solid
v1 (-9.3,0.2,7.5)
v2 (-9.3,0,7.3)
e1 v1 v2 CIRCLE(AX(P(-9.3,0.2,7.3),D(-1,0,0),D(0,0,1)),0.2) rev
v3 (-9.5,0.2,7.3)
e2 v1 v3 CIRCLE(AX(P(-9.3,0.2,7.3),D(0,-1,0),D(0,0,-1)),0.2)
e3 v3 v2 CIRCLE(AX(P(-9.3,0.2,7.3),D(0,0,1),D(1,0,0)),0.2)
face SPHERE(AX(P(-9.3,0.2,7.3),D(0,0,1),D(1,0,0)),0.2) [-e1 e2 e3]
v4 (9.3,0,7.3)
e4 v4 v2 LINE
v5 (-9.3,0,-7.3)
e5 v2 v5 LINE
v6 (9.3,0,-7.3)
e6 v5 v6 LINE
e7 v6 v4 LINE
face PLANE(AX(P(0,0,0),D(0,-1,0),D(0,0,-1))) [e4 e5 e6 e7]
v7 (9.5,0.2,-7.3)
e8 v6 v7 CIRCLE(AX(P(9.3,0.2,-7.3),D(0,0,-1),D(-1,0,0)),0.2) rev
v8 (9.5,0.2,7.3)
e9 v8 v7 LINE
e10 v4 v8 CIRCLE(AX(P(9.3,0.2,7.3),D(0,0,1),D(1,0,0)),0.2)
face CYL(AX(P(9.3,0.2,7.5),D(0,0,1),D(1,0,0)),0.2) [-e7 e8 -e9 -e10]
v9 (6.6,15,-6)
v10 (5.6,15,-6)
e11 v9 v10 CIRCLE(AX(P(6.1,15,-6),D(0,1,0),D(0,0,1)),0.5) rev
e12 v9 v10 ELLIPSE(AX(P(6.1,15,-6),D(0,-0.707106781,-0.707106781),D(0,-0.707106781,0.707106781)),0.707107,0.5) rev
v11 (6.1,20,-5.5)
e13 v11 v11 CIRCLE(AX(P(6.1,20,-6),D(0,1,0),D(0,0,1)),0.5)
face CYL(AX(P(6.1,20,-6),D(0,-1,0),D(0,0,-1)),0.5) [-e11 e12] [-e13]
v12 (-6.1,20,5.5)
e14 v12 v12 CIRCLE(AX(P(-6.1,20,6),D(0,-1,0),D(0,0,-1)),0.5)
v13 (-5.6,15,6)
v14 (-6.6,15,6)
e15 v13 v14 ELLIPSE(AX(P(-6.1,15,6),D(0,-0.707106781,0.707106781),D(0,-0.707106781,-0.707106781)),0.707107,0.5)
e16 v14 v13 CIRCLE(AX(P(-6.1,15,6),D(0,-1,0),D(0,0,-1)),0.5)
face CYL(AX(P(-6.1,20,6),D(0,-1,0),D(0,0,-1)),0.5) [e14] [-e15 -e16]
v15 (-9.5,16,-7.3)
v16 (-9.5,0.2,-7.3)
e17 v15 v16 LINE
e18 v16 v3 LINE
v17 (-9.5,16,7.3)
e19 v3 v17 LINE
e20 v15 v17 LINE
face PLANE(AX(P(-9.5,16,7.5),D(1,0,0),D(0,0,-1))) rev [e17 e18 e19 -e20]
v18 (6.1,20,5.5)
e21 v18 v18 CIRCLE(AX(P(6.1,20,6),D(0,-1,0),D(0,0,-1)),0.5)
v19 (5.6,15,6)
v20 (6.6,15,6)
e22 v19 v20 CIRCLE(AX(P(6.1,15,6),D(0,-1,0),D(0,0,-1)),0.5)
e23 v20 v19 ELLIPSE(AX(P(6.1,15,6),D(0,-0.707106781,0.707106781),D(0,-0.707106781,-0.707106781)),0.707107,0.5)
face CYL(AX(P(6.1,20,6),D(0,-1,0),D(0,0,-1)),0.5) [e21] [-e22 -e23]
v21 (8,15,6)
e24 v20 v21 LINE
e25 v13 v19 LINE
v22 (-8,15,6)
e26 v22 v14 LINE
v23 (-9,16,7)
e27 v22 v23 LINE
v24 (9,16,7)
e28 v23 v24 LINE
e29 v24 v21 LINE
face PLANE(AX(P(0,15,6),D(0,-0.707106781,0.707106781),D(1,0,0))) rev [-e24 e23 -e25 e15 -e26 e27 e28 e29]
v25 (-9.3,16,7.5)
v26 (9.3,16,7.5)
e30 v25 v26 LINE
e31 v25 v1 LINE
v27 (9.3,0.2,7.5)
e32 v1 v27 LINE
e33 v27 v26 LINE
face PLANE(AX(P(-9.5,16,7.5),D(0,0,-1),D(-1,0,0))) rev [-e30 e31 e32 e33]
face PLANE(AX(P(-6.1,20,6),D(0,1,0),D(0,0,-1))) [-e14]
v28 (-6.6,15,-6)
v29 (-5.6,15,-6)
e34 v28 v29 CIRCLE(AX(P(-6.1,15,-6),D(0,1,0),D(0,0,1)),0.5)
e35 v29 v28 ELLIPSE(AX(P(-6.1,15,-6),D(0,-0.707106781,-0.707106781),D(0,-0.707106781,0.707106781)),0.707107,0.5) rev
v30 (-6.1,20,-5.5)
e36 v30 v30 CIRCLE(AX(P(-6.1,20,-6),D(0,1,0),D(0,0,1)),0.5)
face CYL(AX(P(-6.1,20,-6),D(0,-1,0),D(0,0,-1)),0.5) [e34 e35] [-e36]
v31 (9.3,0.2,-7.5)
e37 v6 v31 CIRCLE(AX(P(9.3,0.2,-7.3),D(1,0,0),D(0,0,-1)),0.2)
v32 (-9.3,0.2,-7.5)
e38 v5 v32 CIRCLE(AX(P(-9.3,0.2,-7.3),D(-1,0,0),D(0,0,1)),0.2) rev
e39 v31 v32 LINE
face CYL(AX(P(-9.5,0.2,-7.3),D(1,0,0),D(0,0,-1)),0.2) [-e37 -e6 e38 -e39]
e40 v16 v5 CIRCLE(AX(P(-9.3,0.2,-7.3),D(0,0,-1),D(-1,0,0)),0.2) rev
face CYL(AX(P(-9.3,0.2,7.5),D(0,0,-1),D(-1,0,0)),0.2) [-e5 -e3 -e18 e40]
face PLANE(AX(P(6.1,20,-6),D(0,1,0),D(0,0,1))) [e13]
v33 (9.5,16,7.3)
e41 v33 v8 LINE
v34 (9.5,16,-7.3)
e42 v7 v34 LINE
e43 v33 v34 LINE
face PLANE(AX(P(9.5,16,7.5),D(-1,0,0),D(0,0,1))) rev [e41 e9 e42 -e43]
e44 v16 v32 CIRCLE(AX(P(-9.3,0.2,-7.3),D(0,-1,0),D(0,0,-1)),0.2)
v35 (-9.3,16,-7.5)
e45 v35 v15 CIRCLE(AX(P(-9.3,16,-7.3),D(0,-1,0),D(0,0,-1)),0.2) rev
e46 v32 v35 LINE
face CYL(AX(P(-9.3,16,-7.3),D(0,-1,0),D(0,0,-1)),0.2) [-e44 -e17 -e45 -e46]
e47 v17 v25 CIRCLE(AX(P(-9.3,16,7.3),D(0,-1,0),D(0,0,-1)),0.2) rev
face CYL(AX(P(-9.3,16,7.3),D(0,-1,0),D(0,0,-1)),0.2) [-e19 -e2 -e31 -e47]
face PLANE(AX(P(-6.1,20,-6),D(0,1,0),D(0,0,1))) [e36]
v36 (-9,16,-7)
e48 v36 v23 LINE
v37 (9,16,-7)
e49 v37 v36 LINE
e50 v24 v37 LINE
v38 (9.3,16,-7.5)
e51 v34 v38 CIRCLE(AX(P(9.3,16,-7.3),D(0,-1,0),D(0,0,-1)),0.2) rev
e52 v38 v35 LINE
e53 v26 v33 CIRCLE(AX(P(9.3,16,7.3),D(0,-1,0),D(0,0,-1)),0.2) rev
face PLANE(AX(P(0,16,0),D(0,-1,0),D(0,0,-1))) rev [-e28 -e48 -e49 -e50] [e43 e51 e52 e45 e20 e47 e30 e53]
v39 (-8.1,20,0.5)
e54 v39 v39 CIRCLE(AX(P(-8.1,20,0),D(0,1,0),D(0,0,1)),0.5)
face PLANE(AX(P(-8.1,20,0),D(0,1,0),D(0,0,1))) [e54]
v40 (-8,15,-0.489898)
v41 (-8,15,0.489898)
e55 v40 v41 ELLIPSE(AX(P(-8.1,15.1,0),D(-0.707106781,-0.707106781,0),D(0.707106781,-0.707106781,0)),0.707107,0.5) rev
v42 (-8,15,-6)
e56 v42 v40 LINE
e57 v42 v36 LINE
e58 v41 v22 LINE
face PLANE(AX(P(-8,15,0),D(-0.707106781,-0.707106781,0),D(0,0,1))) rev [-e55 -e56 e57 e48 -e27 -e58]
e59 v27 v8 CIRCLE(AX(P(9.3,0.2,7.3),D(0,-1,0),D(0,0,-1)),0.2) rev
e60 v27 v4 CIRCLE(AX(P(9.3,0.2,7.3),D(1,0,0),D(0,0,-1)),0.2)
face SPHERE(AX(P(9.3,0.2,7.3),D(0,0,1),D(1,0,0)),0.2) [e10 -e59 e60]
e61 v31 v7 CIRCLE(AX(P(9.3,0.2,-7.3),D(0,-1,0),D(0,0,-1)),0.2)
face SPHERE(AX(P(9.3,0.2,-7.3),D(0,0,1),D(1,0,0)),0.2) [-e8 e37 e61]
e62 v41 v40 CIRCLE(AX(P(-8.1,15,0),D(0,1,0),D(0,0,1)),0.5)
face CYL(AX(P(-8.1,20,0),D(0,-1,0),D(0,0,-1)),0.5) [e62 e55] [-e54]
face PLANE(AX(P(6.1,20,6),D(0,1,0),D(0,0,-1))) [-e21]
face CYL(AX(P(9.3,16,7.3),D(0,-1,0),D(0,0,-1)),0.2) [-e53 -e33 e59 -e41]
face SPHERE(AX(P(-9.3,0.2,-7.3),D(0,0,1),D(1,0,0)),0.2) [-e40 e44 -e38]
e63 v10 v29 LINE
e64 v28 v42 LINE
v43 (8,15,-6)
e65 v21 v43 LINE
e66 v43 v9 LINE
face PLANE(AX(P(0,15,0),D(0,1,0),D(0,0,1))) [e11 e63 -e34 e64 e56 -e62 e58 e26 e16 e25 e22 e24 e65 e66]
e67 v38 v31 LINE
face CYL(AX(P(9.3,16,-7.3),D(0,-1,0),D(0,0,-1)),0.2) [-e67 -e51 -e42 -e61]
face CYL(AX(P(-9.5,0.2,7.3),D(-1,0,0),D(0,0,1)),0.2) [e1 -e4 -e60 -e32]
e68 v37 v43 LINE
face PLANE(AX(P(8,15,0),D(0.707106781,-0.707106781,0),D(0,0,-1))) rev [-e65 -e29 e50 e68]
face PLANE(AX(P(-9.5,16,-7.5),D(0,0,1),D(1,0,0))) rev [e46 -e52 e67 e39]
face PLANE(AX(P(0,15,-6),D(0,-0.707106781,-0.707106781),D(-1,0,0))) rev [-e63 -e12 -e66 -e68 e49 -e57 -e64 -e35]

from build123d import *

# Parameters (mm, degrees)
SKETCH2_W           = 19
SKETCH2_H           = 15
BOSS_EXTRUDE1_DEPTH = 16
SKETCH3_W           = 18
SKETCH3_H           = 14
CUT_EXTRUDE1_DEPTH  = 1
CHAMFER1_SIZE       = 1
SKETCH4_R           = 0.5
BOSS_EXTRUDE3_DEPTH = 5
FILLET1_R           = 0.2


with BuildPart() as part:
    # Sketch2 → Boss-Extrude1 (new body)
    with BuildSketch(Plane(origin=(0, 0, 0), x_dir=(1, 0, 0), z_dir=(0, 1, 0))):
        Rectangle(SKETCH2_W, SKETCH2_H)
    extrude(amount=BOSS_EXTRUDE1_DEPTH)

    # Sketch3 → Cut-Extrude1 (cut)
    with BuildSketch(Plane(origin=(0, 16, 0), x_dir=(1, 0, 0), z_dir=(0, 1, 0))):
        Rectangle(SKETCH3_W, SKETCH3_H)
    extrude(amount=-CUT_EXTRUDE1_DEPTH, mode=Mode.SUBTRACT)

    # Chamfer1
    chamfer1_edges = [part.edges().sort_by_distance(p)[0] for p in [
        (0, 15, 7),
        (9, 15, 0),
        (0, 15, -7),
        (-9, 15, 0),
    ]]
    chamfer(chamfer1_edges, length=CHAMFER1_SIZE - 0.0001)  # a hair under: the kernel refuses the full size

    # Sketch4 → Boss-Extrude3 (add)
    with BuildSketch(Plane(origin=(0, 15, 0), x_dir=(1, 0, 0), z_dir=(0, 1, 0))):
        with Locations(Location((-8.1, 0, 0), (0, 0, 78.463040967))):
            Circle(SKETCH4_R)
        with Locations((-6.1, 6)):
            Circle(SKETCH4_R)
        with Locations((6.1, 6)):
            Circle(SKETCH4_R)
    boss_extrude3 = extrude(amount=BOSS_EXTRUDE3_DEPTH)

    # Mirror1: Boss-Extrude3 across plane
    add(boss_extrude3.mirror(Plane.XY))

    # Fillet1
    fillet1_edges = [part.edges().sort_by_distance(p)[0] for p in [
        (0, 0, 7.5),
        (-9.5, 0, 0),
        (0, 0, -7.5),
        (9.5, 0, 0),
        (9.5, 8, 7.5),
        (-9.5, 8, 7.5),
        (-9.5, 8, -7.5),
        (9.5, 8, -7.5),
    ]]
    fillet(fillet1_edges, radius=FILLET1_R)


solid = part.part
